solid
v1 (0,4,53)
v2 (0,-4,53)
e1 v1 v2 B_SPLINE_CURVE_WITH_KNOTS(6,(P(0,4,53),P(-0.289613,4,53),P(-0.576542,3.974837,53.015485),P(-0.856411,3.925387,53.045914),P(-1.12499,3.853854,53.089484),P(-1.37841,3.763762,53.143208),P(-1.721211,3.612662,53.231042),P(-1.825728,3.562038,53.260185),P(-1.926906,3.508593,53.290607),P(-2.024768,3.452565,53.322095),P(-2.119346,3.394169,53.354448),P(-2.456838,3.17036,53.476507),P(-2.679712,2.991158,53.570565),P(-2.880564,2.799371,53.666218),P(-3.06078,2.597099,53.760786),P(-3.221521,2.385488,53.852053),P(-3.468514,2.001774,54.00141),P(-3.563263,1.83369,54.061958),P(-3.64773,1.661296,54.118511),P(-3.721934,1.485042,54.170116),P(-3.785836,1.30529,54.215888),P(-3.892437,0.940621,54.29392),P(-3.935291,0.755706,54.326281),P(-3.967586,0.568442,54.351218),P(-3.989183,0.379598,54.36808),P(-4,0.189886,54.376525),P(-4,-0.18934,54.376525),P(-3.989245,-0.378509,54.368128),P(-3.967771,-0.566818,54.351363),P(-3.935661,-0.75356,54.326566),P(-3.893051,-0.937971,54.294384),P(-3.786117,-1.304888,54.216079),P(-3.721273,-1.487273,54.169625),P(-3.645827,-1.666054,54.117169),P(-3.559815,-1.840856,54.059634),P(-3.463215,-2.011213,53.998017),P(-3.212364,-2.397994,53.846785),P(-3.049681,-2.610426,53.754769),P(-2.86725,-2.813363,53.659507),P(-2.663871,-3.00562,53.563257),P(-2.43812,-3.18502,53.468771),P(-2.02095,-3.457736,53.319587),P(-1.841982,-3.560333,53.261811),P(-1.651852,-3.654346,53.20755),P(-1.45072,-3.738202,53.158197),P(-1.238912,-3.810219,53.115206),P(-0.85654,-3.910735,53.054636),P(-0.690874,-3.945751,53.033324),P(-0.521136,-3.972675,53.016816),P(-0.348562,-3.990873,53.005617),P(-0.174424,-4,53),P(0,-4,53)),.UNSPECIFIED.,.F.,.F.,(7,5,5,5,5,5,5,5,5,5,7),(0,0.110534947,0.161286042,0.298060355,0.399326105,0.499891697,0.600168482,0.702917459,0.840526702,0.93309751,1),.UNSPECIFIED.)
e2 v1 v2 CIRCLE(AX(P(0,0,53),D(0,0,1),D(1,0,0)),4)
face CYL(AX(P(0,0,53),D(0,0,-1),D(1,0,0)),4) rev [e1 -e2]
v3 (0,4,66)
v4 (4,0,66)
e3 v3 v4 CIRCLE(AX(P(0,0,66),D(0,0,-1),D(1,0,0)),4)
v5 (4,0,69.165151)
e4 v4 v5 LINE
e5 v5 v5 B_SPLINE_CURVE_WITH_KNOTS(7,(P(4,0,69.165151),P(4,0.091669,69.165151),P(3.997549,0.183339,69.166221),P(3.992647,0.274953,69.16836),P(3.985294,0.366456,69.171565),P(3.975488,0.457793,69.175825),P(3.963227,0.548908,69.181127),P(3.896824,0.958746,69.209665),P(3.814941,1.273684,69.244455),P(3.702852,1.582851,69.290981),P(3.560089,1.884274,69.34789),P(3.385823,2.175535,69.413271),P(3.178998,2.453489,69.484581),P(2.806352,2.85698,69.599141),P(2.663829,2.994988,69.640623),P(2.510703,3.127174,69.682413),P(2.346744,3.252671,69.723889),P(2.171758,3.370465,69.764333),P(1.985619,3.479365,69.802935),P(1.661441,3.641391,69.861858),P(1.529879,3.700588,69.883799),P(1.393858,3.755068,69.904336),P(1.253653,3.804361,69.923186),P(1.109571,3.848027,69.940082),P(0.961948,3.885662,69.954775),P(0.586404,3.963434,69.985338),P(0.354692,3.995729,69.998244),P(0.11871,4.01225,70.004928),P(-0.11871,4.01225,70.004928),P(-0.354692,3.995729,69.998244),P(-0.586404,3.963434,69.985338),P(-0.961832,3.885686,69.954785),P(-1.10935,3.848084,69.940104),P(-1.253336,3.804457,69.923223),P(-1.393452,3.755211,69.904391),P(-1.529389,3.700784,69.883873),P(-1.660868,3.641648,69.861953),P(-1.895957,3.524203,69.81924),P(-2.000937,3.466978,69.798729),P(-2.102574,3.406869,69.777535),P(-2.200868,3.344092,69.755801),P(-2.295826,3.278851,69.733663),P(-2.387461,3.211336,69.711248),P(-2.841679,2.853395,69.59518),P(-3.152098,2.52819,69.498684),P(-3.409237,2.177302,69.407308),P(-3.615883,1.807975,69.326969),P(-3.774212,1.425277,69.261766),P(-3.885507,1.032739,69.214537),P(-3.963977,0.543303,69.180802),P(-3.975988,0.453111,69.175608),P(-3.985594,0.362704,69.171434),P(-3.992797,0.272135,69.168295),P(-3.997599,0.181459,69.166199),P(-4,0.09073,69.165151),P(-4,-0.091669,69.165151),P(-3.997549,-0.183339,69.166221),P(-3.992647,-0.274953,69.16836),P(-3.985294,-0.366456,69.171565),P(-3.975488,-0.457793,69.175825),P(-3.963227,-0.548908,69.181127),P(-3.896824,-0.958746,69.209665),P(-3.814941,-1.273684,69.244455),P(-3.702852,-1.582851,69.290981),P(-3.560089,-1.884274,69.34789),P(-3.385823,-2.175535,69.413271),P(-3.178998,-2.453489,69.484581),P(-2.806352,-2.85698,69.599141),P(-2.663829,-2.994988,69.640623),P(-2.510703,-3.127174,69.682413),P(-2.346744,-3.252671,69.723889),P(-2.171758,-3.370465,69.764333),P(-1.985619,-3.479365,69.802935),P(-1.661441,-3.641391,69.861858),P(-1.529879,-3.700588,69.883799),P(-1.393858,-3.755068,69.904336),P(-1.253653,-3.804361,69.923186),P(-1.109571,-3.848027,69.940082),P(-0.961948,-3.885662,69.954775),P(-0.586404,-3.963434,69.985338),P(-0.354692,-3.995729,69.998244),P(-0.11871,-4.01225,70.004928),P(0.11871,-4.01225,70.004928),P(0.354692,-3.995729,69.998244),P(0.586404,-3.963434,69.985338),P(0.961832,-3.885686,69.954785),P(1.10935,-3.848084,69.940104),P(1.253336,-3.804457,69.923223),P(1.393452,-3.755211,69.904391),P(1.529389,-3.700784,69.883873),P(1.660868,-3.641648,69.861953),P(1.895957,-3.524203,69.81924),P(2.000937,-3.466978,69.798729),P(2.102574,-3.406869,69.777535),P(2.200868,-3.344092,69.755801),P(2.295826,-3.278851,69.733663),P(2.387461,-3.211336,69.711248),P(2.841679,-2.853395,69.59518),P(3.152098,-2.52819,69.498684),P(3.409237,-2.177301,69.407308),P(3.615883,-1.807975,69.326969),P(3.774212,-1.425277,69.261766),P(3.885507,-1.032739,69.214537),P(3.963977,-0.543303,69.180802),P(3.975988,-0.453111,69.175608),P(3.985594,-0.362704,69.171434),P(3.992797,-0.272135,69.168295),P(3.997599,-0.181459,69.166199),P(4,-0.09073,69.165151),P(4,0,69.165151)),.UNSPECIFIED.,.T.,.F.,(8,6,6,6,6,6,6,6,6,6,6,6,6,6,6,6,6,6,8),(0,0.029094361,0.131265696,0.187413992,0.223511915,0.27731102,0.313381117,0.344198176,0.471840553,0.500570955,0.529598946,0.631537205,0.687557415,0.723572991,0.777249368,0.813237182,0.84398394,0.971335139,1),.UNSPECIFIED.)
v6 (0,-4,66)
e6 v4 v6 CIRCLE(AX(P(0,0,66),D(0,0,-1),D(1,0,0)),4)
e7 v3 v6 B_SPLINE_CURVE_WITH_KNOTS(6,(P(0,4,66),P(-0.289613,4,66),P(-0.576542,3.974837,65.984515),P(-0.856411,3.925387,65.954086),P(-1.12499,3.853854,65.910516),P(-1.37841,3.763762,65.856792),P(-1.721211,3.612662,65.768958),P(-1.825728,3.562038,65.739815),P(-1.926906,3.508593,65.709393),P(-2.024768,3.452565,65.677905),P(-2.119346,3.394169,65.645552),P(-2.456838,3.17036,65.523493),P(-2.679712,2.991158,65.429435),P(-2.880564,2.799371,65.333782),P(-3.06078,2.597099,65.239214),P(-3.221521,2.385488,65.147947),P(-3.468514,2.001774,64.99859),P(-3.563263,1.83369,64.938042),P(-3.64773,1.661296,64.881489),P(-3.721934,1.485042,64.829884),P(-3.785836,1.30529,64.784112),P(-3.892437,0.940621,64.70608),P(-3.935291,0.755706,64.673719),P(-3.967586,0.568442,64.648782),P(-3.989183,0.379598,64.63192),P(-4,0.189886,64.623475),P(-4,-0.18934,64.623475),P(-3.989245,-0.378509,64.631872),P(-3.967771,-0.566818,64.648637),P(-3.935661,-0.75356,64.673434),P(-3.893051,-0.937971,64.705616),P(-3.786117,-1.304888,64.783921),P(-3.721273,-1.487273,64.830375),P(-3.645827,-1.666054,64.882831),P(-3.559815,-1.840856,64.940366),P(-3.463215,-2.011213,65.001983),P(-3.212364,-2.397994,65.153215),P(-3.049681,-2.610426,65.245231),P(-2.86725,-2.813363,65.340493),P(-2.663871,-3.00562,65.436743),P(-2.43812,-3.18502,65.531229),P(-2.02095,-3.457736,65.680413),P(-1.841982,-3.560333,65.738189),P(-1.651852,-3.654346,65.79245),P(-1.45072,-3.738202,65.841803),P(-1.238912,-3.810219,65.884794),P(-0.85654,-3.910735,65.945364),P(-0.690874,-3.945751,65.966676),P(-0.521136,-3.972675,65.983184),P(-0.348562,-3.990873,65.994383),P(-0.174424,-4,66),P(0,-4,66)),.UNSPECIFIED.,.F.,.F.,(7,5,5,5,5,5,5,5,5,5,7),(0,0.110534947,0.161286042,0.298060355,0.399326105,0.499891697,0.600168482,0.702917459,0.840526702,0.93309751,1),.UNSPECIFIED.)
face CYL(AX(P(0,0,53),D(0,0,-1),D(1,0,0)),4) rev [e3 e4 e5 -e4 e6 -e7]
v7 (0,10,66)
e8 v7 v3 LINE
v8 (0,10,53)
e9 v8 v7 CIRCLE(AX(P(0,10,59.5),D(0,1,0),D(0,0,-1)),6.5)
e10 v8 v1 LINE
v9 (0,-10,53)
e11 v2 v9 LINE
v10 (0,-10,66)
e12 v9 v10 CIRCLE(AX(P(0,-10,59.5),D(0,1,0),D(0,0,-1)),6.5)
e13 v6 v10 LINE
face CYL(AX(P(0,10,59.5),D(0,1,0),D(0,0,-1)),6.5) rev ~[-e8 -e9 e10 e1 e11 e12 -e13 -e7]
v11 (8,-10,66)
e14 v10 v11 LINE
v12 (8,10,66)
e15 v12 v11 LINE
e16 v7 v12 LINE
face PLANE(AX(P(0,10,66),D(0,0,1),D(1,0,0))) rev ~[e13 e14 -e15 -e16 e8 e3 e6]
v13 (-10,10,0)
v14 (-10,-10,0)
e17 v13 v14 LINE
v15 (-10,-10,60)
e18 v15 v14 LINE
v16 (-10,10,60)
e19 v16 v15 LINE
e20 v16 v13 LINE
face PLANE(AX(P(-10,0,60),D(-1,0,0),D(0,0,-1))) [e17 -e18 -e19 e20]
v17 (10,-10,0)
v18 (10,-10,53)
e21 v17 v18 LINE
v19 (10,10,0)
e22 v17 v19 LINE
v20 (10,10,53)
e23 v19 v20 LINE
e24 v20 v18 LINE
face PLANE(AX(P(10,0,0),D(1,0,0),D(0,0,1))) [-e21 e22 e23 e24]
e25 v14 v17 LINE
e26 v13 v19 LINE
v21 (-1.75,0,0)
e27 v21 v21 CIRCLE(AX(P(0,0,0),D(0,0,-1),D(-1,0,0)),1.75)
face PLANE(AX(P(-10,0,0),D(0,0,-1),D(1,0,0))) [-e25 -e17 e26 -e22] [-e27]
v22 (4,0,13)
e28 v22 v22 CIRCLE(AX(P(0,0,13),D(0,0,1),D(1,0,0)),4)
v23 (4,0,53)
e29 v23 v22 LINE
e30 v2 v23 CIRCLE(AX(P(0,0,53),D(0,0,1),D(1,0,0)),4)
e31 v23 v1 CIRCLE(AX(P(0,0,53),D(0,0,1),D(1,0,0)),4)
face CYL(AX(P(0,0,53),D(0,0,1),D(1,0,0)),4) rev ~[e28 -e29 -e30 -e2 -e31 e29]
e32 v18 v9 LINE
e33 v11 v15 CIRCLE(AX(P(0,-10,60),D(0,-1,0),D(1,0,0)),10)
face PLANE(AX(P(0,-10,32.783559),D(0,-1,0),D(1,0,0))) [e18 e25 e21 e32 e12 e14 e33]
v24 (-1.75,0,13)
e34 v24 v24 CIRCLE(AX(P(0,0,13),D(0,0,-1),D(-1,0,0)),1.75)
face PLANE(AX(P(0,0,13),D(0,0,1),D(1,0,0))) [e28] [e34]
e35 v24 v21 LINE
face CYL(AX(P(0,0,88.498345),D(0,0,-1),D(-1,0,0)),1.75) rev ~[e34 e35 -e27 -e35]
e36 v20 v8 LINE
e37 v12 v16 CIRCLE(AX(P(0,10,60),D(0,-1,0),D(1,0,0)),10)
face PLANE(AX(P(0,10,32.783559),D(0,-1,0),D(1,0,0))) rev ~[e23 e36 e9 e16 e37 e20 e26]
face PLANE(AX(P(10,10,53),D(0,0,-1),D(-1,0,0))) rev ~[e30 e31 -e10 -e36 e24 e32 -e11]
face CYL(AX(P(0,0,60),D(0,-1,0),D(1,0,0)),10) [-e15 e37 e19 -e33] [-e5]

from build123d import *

# Parameters (mm, degrees)
F1_DEPTH      = 10
F1_DEPTH_BACK = 10
F3_DEPTH      = 20
F4_R          = 4
F5_DEPTH      = 40
F5_DEPTH_BACK = 18.0000001001
F7_D          = 3.5


with BuildPart() as f1:
    # F0 (on Front) → F1 (new body, two sides)
    with BuildSketch(Plane.XZ) as f1_sk:
        with BuildLine():
            ThreePointArc((10, 60), (0, 70), (-10, 60))
            Line((-10, 60), (-10, 0))
            Line((-10, 0), (10, 0))
            Line((10, 0), (10, 60))
        make_face()
    extrude(amount=F1_DEPTH)
    extrude(f1_sk.sketch, amount=-F1_DEPTH_BACK)

    # F2 (on face) → F3 (cut, through all)
    with BuildSketch(Plane(origin=(0, 10, 0), x_dir=(-1, 0, 0), z_dir=(0, 1, 0))):
        with BuildLine():
            Line((-10, 53), (0, 53))
            ThreePointArc((0, 53), (6.5, 59.5), (0, 66))
            Line((0, 66), (-8, 66))
            ThreePointArc((-8, 66), (-9.4868329805, 63.1622776602), (-10, 60))
            Line((-10, 60), (-10, 53))
        make_face()
    extrude(amount=-F3_DEPTH, mode=Mode.SUBTRACT)

    # F4 (on face) → F5 (cut, two sides)
    with BuildSketch(Plane.XY.offset(53)) as f5_sk:
        Circle(F4_R)
    extrude(amount=-F5_DEPTH, mode=Mode.SUBTRACT)
    extrude(f5_sk.sketch, amount=F5_DEPTH_BACK, mode=Mode.SUBTRACT)

    # F7 (through all)
    with Locations(Plane.XY.offset(13)):
        with Locations((0, 0)):
            Hole(F7_D / 2)


solid = f1.part
